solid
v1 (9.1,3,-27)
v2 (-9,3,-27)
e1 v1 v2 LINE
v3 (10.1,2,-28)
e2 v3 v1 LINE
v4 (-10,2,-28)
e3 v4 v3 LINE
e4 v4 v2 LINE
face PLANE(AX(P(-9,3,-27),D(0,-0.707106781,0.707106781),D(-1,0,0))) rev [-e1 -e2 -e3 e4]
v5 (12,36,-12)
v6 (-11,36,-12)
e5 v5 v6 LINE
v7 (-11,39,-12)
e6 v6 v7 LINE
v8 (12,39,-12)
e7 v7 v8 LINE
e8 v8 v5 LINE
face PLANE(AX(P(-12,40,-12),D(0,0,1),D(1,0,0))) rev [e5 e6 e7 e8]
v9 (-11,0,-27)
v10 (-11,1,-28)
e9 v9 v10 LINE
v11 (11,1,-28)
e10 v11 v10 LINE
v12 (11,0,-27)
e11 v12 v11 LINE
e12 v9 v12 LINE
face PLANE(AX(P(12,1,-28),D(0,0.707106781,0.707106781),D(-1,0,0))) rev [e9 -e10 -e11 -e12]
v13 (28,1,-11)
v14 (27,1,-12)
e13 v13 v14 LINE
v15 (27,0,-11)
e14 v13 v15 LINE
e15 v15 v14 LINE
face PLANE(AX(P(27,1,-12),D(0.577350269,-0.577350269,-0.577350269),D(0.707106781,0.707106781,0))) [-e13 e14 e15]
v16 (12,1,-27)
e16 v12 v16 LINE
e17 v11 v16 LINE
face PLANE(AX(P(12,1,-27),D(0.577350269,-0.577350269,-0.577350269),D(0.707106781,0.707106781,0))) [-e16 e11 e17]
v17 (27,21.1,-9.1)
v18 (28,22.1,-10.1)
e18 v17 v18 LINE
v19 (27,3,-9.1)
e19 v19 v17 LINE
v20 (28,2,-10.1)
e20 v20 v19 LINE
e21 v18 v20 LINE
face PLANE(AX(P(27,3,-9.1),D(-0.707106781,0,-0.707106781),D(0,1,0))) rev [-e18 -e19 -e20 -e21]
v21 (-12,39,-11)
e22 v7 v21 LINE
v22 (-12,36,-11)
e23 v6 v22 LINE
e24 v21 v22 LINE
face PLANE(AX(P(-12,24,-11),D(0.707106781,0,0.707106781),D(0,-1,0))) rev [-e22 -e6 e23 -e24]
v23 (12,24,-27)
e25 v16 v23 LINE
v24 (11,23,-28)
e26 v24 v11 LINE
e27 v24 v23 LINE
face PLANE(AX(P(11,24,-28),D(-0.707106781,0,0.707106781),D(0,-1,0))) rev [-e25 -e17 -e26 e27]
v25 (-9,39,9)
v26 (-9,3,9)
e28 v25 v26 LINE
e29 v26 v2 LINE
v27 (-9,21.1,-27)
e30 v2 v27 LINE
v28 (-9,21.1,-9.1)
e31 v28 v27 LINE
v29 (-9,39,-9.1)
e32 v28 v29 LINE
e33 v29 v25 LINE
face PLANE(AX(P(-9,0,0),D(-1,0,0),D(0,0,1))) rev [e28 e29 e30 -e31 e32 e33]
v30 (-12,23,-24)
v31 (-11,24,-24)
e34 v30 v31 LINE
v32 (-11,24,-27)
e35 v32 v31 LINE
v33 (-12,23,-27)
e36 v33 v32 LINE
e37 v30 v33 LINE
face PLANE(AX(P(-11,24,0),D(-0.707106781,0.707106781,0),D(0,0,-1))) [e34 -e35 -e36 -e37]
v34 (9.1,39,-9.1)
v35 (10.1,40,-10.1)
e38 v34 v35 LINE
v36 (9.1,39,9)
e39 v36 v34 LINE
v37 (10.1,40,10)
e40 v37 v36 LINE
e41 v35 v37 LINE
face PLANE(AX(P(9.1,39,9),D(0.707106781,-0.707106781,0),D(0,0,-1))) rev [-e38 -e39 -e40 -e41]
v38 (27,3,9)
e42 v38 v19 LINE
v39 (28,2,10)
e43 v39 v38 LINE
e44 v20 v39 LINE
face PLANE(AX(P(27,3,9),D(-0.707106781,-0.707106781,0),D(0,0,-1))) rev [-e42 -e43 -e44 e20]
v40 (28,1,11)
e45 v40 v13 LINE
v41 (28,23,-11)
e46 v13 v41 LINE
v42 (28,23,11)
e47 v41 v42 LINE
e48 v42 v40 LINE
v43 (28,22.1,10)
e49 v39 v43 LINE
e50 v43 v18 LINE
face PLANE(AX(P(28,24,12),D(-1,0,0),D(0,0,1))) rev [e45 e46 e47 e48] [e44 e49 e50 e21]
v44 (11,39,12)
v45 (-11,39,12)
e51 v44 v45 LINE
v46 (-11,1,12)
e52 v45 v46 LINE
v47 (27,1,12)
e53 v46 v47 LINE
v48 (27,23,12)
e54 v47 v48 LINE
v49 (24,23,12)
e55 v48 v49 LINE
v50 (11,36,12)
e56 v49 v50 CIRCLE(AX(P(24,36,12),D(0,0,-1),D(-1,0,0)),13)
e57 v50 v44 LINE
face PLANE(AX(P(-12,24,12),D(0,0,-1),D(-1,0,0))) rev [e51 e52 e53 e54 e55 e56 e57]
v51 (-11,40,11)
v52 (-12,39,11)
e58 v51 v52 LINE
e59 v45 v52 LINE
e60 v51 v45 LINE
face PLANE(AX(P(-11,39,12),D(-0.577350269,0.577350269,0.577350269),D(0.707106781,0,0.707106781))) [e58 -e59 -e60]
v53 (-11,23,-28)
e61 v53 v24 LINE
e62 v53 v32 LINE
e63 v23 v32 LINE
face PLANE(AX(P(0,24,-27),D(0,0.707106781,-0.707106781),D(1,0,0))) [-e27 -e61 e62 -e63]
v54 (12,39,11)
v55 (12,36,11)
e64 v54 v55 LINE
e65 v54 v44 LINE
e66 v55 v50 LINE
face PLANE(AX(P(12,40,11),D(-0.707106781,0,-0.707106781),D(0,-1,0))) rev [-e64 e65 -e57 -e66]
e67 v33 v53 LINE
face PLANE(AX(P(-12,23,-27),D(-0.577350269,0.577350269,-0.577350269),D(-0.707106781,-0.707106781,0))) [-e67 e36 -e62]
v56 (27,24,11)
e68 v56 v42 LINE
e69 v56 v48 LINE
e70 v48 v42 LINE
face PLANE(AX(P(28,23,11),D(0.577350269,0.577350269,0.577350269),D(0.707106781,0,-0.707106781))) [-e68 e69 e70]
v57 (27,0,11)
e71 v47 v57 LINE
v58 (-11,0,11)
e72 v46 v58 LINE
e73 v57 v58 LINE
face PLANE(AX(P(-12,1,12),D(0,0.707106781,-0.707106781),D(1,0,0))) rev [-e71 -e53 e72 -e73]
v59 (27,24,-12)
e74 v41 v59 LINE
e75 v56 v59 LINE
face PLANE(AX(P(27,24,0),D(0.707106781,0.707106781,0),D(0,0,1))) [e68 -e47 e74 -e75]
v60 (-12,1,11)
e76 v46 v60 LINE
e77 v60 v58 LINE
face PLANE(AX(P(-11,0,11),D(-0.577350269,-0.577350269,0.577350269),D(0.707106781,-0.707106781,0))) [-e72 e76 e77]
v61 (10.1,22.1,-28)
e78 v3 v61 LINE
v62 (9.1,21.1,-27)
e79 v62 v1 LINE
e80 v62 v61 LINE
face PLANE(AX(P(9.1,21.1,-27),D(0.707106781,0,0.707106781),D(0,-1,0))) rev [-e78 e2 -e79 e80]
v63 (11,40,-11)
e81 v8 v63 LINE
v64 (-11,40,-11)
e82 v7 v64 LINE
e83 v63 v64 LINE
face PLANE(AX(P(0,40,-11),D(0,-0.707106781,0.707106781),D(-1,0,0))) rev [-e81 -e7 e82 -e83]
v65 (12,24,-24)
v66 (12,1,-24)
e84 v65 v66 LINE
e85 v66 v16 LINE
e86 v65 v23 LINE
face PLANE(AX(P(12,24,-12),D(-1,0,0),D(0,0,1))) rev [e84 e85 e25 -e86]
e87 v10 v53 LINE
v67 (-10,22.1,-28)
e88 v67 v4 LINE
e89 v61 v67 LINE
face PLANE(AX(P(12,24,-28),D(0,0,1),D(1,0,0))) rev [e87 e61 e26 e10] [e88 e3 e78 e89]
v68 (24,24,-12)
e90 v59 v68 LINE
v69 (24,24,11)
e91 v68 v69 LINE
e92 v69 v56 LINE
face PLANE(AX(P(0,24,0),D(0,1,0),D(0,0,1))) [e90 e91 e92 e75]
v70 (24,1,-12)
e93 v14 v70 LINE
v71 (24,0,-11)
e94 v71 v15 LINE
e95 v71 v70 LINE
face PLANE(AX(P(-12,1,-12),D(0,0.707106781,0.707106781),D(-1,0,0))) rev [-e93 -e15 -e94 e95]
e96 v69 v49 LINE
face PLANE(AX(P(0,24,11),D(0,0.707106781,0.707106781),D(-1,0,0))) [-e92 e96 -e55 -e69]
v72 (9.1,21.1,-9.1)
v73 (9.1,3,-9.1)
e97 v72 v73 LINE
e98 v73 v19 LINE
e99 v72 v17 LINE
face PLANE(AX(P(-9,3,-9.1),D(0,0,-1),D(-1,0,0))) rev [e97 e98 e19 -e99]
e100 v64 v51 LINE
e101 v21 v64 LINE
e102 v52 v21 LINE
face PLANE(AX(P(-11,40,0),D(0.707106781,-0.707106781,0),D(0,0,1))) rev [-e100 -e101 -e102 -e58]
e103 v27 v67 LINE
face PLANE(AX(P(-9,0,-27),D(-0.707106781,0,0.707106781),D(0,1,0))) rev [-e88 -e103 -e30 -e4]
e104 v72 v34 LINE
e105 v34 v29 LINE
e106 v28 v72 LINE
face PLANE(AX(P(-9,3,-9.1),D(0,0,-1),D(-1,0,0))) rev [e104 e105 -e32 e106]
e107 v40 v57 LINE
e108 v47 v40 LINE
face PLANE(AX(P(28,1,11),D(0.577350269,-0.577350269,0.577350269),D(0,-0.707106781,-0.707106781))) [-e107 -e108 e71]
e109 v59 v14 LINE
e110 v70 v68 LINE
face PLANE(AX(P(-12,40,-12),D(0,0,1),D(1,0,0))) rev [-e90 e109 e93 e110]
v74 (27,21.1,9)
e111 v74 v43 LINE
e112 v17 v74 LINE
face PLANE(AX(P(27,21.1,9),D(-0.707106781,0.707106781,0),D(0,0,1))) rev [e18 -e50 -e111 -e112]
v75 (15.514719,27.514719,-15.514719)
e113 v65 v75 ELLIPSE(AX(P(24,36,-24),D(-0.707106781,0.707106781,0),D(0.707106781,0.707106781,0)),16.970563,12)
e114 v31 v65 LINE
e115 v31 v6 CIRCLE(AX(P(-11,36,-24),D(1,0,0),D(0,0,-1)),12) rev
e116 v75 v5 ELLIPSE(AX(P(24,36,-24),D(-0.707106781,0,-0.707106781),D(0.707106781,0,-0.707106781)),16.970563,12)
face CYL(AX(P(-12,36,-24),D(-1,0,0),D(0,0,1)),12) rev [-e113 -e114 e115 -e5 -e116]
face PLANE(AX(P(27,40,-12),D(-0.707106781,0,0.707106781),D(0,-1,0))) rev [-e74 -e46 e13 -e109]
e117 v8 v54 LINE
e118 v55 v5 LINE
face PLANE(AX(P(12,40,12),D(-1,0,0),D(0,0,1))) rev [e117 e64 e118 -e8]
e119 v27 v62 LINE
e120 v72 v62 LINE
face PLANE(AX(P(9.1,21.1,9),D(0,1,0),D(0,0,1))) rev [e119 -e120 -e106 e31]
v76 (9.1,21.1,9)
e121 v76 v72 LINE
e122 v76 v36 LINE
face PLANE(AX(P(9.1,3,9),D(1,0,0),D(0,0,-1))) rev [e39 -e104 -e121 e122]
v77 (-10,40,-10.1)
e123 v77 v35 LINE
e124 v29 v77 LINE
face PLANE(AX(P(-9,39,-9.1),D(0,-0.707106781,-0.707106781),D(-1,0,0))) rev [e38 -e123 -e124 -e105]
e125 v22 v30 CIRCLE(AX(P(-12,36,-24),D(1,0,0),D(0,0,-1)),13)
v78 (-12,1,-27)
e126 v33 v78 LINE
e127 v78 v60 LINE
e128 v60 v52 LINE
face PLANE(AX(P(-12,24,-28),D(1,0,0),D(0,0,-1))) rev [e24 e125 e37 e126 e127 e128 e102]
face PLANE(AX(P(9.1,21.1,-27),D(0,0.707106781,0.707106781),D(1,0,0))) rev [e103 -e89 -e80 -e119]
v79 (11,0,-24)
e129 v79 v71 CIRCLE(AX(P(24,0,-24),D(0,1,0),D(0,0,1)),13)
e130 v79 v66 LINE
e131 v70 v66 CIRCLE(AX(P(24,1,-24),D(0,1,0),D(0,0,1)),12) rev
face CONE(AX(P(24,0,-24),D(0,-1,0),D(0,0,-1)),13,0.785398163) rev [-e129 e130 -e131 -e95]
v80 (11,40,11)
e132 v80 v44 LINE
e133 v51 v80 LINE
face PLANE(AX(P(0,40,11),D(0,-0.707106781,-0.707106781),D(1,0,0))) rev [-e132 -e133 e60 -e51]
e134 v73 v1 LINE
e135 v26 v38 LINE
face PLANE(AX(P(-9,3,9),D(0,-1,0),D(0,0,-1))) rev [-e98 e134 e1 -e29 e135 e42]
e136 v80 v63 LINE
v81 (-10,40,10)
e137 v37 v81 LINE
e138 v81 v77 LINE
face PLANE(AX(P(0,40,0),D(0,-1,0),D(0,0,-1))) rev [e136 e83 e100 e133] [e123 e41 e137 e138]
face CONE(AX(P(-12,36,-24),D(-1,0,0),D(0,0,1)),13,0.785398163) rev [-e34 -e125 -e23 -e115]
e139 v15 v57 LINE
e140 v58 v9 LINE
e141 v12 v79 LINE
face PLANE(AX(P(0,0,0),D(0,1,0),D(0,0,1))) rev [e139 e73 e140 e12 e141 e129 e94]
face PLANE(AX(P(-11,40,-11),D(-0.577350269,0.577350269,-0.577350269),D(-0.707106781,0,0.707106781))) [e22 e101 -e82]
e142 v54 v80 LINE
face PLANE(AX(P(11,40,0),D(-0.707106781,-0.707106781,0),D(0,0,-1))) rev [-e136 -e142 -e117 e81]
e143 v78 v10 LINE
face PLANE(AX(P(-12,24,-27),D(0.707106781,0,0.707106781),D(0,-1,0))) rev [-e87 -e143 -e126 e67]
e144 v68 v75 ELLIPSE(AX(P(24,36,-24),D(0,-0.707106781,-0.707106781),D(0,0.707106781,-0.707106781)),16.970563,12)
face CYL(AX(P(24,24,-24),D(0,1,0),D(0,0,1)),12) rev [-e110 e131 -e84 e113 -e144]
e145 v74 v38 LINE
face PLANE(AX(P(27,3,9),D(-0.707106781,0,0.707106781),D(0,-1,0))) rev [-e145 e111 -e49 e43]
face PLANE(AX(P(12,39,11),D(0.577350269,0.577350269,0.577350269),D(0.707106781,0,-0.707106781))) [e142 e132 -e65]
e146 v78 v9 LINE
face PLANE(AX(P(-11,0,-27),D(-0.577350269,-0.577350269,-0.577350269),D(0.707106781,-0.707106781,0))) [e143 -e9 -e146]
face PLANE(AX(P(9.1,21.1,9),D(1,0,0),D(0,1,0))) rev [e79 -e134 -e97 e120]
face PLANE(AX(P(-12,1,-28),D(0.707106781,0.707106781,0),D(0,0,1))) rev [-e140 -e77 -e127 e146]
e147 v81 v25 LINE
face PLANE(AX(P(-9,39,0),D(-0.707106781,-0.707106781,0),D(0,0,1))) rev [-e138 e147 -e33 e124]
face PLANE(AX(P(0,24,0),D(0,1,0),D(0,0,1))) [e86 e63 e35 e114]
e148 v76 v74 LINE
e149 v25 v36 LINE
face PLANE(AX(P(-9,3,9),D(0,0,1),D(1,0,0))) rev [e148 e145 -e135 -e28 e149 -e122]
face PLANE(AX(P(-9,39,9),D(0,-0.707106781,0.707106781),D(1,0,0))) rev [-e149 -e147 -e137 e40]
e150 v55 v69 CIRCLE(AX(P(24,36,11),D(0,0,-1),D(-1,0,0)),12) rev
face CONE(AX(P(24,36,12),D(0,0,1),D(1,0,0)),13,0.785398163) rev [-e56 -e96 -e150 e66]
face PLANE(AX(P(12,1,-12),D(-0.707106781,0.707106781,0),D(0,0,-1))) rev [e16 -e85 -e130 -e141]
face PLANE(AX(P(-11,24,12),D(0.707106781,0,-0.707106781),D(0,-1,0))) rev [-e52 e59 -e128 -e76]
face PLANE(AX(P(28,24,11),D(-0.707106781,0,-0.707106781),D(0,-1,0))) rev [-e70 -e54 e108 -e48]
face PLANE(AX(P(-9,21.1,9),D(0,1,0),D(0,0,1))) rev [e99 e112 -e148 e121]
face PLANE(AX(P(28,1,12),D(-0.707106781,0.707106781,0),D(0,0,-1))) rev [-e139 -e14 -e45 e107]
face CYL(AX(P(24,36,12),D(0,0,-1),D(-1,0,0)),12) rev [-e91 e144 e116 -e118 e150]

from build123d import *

# Parameters (mm, degrees)
BOSS_EXTRUDE1_DEPTH = 24
SKETCH2_W           = 24
SKETCH2_H           = 24
BOSS_EXTRUDE2_DEPTH = 16
FILLET1_R           = 12
FILLET2_R           = 12
SKETCH3_W           = 18.1
SKETCH3_H           = 18.1
CUT_EXTRUDE1_DEPTH  = 37
SKETCH4_W           = 18.1
SKETCH4_H           = 18.1
CUT_EXTRUDE2_DEPTH  = 37
SKETCH5_W           = 18.1
SKETCH5_H           = 18.1
CUT_EXTRUDE3_DEPTH  = 37
CHAMFER1_SIZE       = 1


with BuildPart() as part:
    # Sketch1 → Boss-Extrude1 (new body)
    with BuildSketch(Plane(origin=(0, 0, 0), x_dir=(1, 0, 0), z_dir=(0, 1, 0))):
        Polygon((-12, 28), (-12, -12), (28, -12), (28, 12), (12, 12), (12, 28), align=None)
    extrude(amount=BOSS_EXTRUDE1_DEPTH)

    # Sketch2 → Boss-Extrude2 (add)
    with BuildSketch(Plane(origin=(0, 24, 0), x_dir=(1, 0, 0), z_dir=(0, 1, 0))):
        Rectangle(SKETCH2_W, SKETCH2_H)
    extrude(amount=BOSS_EXTRUDE2_DEPTH)

    # Fillet1
    # the kernel refuses this fillet: 12 mm, written as the material it adds along each edge
    with BuildSketch(Plane(origin=(12, 24, 12), x_dir=(1, 0, 0), z_dir=(0, 0, -1))) as fillet1_piece_1:
        with BuildLine():
            CenterArc((FILLET1_R, -FILLET1_R), FILLET1_R, 90, 90)
            Line((0, -FILLET1_R), (0, 0))
            Line((0, 0), (FILLET1_R, 0))
        make_face()
    extrude(amount=24)

    # Fillet2
    # the kernel refuses this fillet: 12 mm, written as the material it adds along each edge
    with BuildSketch(Plane(origin=(12, 0, -12), x_dir=(1, 0, 0), z_dir=(0, 1, 0)), Plane(origin=(12, 24, -12), x_dir=(0, 1, 0), z_dir=(-1, 0, 0))) as fillet2_piece_1:
        with BuildLine():
            CenterArc((FILLET2_R, FILLET2_R), FILLET2_R, 180, 90)
            Line((0, FILLET2_R), (0, 0))
            Line((0, 0), (FILLET2_R, 0))
        make_face()
    extrude(amount=24)
    with BuildSketch(Plane(origin=(42, 24, -12), x_dir=(0, 1, 0), z_dir=(-1, 0, 0))) as fillet2_piece_2a_section:
        with BuildLine():
            CenterArc((FILLET2_R, FILLET2_R), FILLET2_R, 180, 90)
            Line((0, FILLET2_R), (0, 0))
            Line((0, 0), (FILLET2_R, 0))
        make_face()
    fillet2_piece_2a = extrude(amount=54, mode=Mode.PRIVATE)
    fillet2_piece_2a = fillet2_piece_2a - Plane(origin=(24, 36, -15.874937315), x_dir=(1, 0, 0), z_dir=(0, 0, 1)) * Cylinder(12, 156, mode=Mode.PRIVATE)
    fillet2_piece_2a = split(fillet2_piece_2a, bisect_by=Plane(origin=(28, 25.203397989, -15.874937315), z_dir=(-1, 0, 0)), keep=Keep.TOP, mode=Mode.PRIVATE)
    fillet2_piece_2a = split(fillet2_piece_2a, bisect_by=Plane(origin=(12, 25.203397989, -15.874937315), z_dir=(1, 0, 0)), keep=Keep.TOP, mode=Mode.PRIVATE)
    with BuildSketch(Plane(origin=(12, 0, -12), x_dir=(1, 0, 0), z_dir=(0, 1, 0))) as fillet2_piece_2b_section:
        with BuildLine():
            CenterArc((FILLET2_R, FILLET2_R), FILLET2_R, 180, 90)
            Line((0, FILLET2_R), (0, 0))
            Line((0, 0), (FILLET2_R, 0))
        make_face()
    fillet2_piece_2b = extrude(amount=54, mode=Mode.PRIVATE)
    fillet2_piece_2b = fillet2_piece_2b - Plane(origin=(24, 36, -15.874937326), x_dir=(1, 0, 0), z_dir=(0, 0, 1)) * Cylinder(12, 156, mode=Mode.PRIVATE)
    fillet2_piece_2b = split(fillet2_piece_2b, bisect_by=Plane(origin=(13.203398, 24, -15.874937326), z_dir=(0, 1, 0)), keep=Keep.TOP, mode=Mode.PRIVATE)
    fillet2_piece_2b = split(fillet2_piece_2b, bisect_by=Plane(origin=(13.203398, 40, -15.874937326), z_dir=(0, -1, 0)), keep=Keep.TOP, mode=Mode.PRIVATE)
    fillet2_piece_2 = fillet2_piece_2a & fillet2_piece_2b
    add(fillet2_piece_2)

    # Sketch3 → Cut-Extrude1 (cut)
    with BuildSketch(Plane(origin=(28, 0, 0), x_dir=(0, 0, -1), z_dir=(1, 0, 0))):
        with Locations((0.05, 12.05)):
            Rectangle(SKETCH3_W, SKETCH3_H)
    extrude(amount=-CUT_EXTRUDE1_DEPTH, mode=Mode.SUBTRACT)

    # Sketch4 → Cut-Extrude2 (cut)
    with BuildSketch(Plane(origin=(0, 40, 0), x_dir=(1, 0, 0), z_dir=(0, 1, 0))):
        with Locations((0.05, 0.05)):
            Rectangle(SKETCH4_W, SKETCH4_H)
    extrude(amount=-CUT_EXTRUDE2_DEPTH, mode=Mode.SUBTRACT)

    # Sketch5 → Cut-Extrude3 (cut)
    with BuildSketch(Plane(origin=(0, 0, -28), x_dir=(-1, 0, 0), z_dir=(0, 0, -1))):
        with Locations((-0.05, 12.05)):
            Rectangle(SKETCH5_W, SKETCH5_H)
    extrude(amount=-CUT_EXTRUDE3_DEPTH, mode=Mode.SUBTRACT)

    # Chamfer1
    chamfer1_edges = [part.edges().sort_by_distance(p)[0] for p in [
        (12, 12, -28),
        (28, 12, -12),
        (28, 12, 12),
        (-12, 20, 12),
        (-12, 12, -28),
        (28, 24, 0),
        (-12, 38, -12),
        (12, 38, 12),
        (-12, 40, 0),
        (0, 40, 12),
        (12, 40, 0),
        (0, 40, -12),
        (26, 24, 12),
        (15.514718626, 27.514718626, 12),
        (0, 24, -28),
        (12, 0, -26),
        (15.514718626, 0, -15.514718626),
        (-12, 27.514718626, -15.514718626),
        (28, 12.05, -9.1),
        (28, 21.1, -0.05),
        (28, 12.05, 9),
        (28, 3, -0.05),
        (26, 0, -12),
        (28, 0, 0),
        (-12, 24, -26),
        (8, 0, 12),
        (9.1, 40, -0.05),
        (0.05, 40, -9.1),
        (-9, 40, -0.05),
        (0.05, 40, 9),
        (-12, 0, -8),
        (0, 0, -28),
        (-9, 12.05, -28),
        (0.05, 21.1, -28),
        (9.1, 12.05, -28),
        (0.05, 3, -28),
    ]]
    chamfer(chamfer1_edges, length=CHAMFER1_SIZE)


solid = part.part
